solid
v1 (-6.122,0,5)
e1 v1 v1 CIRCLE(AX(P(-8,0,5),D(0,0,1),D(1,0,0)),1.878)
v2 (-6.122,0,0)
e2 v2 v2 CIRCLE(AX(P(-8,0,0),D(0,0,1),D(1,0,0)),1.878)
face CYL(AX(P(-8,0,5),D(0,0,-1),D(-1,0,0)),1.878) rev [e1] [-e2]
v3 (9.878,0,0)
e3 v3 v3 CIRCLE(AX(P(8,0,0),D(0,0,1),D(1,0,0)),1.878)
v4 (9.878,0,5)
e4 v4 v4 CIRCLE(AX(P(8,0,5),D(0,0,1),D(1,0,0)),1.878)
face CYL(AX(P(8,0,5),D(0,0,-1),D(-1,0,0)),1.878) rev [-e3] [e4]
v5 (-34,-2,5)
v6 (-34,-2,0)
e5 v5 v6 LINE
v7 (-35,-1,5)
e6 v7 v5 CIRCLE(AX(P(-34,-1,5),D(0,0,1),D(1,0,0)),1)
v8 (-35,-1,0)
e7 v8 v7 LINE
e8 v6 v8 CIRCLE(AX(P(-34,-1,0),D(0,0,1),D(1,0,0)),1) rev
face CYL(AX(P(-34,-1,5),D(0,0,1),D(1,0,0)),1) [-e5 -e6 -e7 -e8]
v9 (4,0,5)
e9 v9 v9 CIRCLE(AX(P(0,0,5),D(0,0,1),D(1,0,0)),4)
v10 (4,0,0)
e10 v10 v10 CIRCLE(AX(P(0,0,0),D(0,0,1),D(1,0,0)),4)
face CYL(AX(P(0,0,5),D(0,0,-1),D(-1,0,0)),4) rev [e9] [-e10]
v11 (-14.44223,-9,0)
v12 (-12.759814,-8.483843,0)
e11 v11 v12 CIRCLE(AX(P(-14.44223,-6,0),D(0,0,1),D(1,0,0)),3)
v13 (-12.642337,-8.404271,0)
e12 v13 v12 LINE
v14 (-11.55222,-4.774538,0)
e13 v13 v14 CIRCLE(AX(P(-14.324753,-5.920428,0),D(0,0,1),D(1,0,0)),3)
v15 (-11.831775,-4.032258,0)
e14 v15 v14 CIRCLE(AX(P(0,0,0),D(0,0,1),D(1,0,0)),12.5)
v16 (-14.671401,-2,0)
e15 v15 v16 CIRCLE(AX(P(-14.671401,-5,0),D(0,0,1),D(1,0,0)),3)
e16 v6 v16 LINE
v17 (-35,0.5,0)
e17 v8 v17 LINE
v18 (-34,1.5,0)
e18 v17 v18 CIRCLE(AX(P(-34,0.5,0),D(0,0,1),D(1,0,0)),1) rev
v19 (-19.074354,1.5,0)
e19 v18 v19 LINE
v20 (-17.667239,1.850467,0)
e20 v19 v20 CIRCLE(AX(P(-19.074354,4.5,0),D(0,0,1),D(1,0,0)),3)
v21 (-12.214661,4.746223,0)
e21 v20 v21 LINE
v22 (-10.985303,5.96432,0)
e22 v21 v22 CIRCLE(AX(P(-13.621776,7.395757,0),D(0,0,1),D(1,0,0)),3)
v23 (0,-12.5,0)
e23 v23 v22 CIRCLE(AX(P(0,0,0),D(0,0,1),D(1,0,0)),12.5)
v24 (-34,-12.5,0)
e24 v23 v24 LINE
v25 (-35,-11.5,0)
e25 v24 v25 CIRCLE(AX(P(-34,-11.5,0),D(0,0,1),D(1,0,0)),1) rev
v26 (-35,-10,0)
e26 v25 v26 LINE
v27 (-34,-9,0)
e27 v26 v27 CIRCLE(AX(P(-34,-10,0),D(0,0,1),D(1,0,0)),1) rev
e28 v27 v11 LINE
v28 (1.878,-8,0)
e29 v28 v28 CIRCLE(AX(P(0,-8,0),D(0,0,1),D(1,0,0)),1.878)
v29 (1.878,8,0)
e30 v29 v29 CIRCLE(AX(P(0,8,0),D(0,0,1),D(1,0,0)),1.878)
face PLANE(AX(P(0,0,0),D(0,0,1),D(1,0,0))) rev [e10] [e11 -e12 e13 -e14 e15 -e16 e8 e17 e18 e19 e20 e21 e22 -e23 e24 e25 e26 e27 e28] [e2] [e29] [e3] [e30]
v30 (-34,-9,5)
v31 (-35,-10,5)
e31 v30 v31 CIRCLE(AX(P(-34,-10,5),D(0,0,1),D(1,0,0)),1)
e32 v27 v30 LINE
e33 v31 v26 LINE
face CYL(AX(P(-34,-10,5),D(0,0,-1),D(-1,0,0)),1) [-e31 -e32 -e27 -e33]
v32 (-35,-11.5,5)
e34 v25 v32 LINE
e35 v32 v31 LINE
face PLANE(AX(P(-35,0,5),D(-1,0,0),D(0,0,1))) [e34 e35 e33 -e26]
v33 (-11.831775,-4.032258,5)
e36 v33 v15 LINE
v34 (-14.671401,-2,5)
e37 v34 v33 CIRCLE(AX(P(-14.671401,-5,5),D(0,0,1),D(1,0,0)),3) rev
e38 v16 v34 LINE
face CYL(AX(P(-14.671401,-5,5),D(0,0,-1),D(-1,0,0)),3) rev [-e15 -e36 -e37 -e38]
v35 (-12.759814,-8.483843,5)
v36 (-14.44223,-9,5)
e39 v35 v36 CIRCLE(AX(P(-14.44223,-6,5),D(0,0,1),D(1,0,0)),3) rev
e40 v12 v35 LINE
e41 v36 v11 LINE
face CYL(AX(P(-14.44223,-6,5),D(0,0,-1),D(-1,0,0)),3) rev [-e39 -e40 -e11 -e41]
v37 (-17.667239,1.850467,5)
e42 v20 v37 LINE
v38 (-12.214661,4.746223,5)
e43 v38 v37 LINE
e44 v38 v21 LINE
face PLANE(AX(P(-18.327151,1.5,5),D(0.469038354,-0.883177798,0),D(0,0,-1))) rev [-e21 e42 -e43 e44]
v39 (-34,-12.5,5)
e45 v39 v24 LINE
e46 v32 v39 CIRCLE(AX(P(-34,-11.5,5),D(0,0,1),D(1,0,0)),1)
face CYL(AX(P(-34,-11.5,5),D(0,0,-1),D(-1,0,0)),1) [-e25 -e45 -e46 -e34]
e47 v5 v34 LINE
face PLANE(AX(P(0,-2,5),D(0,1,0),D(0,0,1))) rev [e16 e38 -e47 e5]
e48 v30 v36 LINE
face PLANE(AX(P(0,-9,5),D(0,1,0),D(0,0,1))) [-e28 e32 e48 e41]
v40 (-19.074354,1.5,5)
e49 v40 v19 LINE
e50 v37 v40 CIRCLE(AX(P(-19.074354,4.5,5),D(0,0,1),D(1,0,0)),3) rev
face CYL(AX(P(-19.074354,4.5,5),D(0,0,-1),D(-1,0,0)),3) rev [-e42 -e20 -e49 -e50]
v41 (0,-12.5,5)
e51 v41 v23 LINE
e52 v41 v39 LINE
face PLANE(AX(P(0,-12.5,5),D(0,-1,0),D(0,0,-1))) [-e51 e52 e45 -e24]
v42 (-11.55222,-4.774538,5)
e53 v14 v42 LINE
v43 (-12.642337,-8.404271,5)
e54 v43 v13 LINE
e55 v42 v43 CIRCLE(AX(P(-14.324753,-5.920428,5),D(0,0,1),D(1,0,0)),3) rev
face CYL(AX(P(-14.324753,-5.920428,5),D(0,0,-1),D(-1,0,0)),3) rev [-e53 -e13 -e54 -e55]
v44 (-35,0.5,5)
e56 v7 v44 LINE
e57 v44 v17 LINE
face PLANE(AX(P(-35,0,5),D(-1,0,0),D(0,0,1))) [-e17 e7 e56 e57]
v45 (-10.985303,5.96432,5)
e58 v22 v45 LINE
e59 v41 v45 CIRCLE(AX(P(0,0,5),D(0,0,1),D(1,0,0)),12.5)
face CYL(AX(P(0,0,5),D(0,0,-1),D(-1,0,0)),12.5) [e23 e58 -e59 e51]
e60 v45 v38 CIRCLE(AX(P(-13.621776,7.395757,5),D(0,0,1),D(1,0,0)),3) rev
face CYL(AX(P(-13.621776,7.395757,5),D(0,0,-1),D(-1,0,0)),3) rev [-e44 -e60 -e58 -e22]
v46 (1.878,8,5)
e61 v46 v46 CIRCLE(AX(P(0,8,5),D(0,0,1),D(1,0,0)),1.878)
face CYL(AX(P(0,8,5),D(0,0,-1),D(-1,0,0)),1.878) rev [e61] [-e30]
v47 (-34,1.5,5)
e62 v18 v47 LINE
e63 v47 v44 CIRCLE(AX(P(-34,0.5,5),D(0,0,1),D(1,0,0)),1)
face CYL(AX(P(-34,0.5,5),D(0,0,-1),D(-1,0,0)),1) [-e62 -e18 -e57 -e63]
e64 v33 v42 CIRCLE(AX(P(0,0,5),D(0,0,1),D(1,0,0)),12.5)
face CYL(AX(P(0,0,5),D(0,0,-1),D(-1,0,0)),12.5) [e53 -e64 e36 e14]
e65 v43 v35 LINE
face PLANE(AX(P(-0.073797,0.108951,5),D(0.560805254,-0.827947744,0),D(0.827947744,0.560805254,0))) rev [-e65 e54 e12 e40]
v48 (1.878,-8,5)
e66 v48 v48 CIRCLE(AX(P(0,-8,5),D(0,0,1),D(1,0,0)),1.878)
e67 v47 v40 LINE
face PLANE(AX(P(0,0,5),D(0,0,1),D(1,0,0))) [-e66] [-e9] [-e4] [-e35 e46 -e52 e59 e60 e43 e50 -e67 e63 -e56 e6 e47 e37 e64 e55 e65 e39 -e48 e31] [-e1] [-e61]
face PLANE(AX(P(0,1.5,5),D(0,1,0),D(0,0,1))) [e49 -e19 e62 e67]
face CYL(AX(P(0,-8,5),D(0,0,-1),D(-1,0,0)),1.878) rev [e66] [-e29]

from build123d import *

# Parameters (mm, degrees)
SKETCH1_R           = 1.878
SKETCH1_R_2         = 4
BOSS_EXTRUDE1_DEPTH = 5
FILLET1_R           = 3
FILLET2_R           = 3
FILLET3_R           = 1
FILLET4_R           = 1


with BuildPart() as part:
    # Sketch1 → Boss-Extrude1 (new body)
    with BuildSketch(Plane.XY):
        with BuildLine():
            Line((0, -12.5), (-35, -12.5))
            Line((-35, -12.5), (-35, -9))
            Line((-35, -9), (-13.521844546, -9))
            Line((-13.521844546, -9), (-10.422570658, -6.900726112))
            ThreePointArc((-10.422570658, -6.900726112), (-11.641569013, -4.552347848), (-12.338962679, -2))
            Line((-12.338962679, -2), (-35, -2))
            Line((-35, -2), (-35, 1.5))
            Line((-35, 1.5), (-12.409673646, 1.5))
            ThreePointArc((-12.409673646, 1.5), (9.354143467, 8.291561976), (0, -12.5))
        make_face()
        with Locations((0, 8)):
            Circle(SKETCH1_R, mode=Mode.SUBTRACT)
        with Locations((8, 0)):
            Circle(SKETCH1_R, mode=Mode.SUBTRACT)
        with Locations((0, -8)):
            Circle(SKETCH1_R, mode=Mode.SUBTRACT)
        with Locations((-8, 0)):
            Circle(SKETCH1_R, mode=Mode.SUBTRACT)
        Circle(SKETCH1_R_2, mode=Mode.SUBTRACT)
    extrude(amount=BOSS_EXTRUDE1_DEPTH)

    # Chamfer1
    # the kernel refuses this chamfer: 6.874632774, 6 mm, written as the material it adds along each edge
    with BuildSketch(Plane(origin=(-12.409673646, 1.5, 0), x_dir=(-0.9997808942395764, -0.02093235566086501, 0), z_dir=(0, 0, 1))) as chamfer1_piece_1:
        with BuildLine():
            Line((6.161688618, 0), (-1.363052276, -3.796482939))
            Line((-1.363052276, -3.796482939), (-1.486883786, -3.736733567))
            ThreePointArc((-1.486883786, -3.736733567), (-0.576736398, -1.931017764), (-0.136123845, 0.019352752))
            Line((-0.136123845, 0.019352752), (0.002878045, 0.13746253))
            ThreePointArc((0.002878045, 0.13746253), (3.082372441, 0.072987331), (6.164566664, 0.13746253))
            Line((6.164566664, 0.13746253), (6.161688618, 0))
        make_face()
    extrude(amount=5)

    # Fillet1
    fillet1_edges = [part.edges().sort_by_distance(p)[0] for p in [
        (-13.521844546, -9, 2.5),
        (-10.422570658, -6.900726112, 2.5),
        (-12.338962679, -2, 2.5),
    ]]
    fillet(fillet1_edges, radius=FILLET1_R)

    # Fillet2
    fillet2_edges = [part.edges().sort_by_distance(p)[0] for p in [
        (-18.327151282, 1.5, 2.5),
        (-11.369250275, 5.195204345, 2.5),
    ]]
    fillet(fillet2_edges, radius=FILLET2_R)

    # Fillet3
    fillet3_edges = [part.edges().sort_by_distance(p)[0] for p in [
        (-35, -2, 2.5),
        (-35, -9, 2.5),
    ]]
    fillet(fillet3_edges, radius=FILLET3_R)

    # Fillet4
    fillet4_edges = [part.edges().sort_by_distance(p)[0] for p in [
        (-35, 1.5, 2.5),
        (-35, -12.5, 2.5),
    ]]
    fillet(fillet4_edges, radius=FILLET4_R)


solid = part.part
